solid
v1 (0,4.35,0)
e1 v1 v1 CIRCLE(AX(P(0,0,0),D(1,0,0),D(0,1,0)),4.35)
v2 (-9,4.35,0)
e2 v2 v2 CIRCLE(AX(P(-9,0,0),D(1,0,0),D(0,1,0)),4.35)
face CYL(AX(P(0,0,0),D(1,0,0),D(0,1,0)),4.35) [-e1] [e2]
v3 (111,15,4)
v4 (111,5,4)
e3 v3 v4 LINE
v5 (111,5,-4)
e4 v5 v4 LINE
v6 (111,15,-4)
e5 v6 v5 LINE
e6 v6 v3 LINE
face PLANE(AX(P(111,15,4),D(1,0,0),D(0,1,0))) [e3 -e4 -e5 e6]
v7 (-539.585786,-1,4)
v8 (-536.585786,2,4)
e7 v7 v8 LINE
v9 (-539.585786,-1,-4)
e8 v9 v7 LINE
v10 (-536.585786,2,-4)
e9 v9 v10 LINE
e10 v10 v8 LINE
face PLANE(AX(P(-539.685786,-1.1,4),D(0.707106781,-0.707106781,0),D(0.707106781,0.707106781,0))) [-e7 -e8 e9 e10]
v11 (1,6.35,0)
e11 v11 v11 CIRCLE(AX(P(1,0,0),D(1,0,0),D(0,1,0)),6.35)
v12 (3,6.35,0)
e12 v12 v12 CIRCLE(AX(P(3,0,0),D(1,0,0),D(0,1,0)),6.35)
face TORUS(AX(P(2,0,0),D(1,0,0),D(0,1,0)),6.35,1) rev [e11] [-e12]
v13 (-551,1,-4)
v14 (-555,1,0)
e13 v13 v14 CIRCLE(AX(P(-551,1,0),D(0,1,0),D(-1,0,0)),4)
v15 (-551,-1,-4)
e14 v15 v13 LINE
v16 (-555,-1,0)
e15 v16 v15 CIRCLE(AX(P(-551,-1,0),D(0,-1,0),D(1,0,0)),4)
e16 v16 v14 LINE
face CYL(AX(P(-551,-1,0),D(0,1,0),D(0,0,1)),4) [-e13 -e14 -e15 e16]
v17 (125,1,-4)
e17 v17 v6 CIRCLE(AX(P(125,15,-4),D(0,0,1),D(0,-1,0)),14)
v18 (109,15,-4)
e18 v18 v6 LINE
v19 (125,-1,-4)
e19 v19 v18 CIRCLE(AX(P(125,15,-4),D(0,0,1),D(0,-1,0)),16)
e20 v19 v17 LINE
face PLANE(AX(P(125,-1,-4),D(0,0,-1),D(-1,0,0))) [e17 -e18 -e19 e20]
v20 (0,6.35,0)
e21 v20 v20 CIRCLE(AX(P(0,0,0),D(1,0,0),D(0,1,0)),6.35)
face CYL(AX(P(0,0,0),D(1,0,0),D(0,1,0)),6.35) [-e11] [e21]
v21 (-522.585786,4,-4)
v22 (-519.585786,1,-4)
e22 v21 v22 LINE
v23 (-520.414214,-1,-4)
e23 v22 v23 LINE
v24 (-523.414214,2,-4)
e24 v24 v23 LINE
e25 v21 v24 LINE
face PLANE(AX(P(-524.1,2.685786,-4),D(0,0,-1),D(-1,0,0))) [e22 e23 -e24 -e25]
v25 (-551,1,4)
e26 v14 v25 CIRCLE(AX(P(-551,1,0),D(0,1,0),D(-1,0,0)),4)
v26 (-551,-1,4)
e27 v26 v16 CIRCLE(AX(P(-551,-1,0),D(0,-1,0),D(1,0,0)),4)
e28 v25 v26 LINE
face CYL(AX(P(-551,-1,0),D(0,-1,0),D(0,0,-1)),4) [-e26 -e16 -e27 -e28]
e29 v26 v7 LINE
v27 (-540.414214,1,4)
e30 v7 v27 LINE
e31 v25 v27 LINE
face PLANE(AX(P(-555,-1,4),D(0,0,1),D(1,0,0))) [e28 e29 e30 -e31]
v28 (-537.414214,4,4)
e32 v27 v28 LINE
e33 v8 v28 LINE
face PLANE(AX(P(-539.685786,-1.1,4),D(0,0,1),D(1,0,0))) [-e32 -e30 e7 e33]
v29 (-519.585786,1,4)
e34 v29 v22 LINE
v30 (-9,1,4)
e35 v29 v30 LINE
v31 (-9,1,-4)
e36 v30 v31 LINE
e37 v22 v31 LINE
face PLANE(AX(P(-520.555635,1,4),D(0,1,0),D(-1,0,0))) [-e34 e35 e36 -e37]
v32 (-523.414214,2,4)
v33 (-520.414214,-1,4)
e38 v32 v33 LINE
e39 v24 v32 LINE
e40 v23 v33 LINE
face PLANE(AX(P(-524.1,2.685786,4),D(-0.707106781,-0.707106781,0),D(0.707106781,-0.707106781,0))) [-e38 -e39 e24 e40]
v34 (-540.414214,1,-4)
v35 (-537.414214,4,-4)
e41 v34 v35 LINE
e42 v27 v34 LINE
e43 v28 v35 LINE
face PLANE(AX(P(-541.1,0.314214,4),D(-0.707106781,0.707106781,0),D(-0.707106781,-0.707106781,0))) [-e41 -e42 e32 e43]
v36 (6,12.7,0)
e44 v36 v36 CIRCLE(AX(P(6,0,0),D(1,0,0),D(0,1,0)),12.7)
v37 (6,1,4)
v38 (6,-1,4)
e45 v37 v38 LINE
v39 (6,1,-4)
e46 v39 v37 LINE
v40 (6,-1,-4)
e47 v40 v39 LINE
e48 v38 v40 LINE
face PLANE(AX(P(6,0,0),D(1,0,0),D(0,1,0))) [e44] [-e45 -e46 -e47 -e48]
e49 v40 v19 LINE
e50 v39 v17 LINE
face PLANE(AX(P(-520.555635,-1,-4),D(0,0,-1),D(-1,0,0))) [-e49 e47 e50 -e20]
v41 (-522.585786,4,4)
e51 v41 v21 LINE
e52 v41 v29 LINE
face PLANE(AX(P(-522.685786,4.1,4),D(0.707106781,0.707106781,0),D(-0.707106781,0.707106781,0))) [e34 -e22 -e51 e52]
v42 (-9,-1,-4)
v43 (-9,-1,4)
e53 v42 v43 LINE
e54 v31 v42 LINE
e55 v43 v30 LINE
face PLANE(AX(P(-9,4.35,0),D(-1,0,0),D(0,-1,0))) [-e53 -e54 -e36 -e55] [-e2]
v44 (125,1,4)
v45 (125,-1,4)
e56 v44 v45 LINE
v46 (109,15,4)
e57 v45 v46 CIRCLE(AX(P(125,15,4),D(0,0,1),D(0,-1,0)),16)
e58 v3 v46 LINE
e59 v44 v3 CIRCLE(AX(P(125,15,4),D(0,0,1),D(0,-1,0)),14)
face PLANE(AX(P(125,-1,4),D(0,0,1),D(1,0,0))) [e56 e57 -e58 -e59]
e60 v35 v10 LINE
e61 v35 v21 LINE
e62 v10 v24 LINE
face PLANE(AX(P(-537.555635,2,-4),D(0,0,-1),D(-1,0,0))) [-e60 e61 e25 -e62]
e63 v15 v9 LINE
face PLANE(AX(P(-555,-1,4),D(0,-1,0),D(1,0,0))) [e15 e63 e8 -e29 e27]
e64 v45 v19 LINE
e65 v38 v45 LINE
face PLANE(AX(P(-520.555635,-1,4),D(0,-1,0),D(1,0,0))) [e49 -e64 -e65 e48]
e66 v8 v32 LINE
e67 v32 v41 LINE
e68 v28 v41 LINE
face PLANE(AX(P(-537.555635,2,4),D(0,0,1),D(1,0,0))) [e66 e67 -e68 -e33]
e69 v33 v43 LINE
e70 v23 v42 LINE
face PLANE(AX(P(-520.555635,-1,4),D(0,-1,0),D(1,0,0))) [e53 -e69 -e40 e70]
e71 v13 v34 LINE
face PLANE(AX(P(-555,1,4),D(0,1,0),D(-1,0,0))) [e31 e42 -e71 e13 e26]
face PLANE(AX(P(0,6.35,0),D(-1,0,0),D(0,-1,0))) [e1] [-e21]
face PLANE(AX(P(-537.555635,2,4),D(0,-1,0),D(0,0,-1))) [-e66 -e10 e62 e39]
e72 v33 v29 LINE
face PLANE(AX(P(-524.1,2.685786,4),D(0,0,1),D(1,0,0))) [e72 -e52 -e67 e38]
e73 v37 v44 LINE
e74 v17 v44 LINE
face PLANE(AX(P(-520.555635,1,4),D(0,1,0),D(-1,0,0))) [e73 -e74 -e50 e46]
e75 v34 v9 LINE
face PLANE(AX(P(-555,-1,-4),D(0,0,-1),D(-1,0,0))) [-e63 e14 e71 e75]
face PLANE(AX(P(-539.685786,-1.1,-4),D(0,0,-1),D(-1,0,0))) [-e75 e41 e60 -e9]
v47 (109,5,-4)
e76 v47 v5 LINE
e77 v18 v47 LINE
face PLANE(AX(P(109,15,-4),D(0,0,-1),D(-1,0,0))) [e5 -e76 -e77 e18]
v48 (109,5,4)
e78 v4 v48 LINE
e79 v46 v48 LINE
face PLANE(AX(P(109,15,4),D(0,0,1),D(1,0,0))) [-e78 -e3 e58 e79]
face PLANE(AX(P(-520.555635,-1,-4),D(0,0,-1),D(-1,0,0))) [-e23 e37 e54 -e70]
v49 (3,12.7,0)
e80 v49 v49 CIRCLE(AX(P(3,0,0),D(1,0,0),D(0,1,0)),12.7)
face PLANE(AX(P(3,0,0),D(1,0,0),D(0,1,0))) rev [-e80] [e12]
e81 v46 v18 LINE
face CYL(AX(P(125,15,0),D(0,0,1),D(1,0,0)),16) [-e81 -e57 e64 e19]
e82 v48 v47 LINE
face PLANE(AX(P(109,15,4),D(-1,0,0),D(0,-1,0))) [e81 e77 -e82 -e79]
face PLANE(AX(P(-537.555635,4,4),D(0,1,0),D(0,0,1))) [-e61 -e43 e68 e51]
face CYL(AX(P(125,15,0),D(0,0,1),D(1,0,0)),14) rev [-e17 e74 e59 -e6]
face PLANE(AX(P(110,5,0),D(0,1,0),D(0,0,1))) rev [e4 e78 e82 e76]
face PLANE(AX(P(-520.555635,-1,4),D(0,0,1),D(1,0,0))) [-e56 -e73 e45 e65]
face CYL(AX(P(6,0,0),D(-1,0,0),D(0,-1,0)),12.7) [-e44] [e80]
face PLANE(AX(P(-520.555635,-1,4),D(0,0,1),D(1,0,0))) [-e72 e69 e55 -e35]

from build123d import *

# Parameters (mm, degrees)
SZKIC6_R                    = 12.7
DODANIE_WYCI_GNI_CIE3_DEPTH = 3
SZKIC7_W                    = 8
SZKIC7_H                    = 2
ZAOKR_GLENIE3_R             = 4


with BuildPart() as part:
    # Szkic5 → Obrót1 (revolve)
    with BuildSketch(Plane.XY):
        with BuildLine():
            Line((0, 6.35), (1, 6.35))
            ThreePointArc((1, 6.35), (2, 5.35), (3, 6.35))
            Line((3, 6.35), (3, 0))
            Line((3, 0), (0, 0))
            Line((0, 0), (-9, 0))
            Line((-9, 0), (-9, 4.35))
            Line((-9, 4.35), (0, 4.35))
            Line((0, 4.35), (0, 6.35))
        make_face()
    revolve(axis=Axis((0, 0, 0), (-1, 0, 0)))

    # Szkic6 → Dodanie-wyciągnięcie3 (add)
    with BuildSketch(Plane(origin=(3, 0, 0), x_dir=(0, 0, -1), z_dir=(1, 0, 0))):
        with Locations(Location((0, 0, 0), (0, 0, 90))):
            Circle(SZKIC6_R)
    extrude(amount=DODANIE_WYCI_GNI_CIE3_DEPTH)

    # Wyciągnięcie po ścieżce1: sweep along a path in Szkic1
    with BuildLine(Plane.XY) as wyci_gni_cie_po_cie_ce1_path:
        Line((110, 5), (110, 15))
        ThreePointArc((110, 15), (135.606601718, 25.606601718), (125, 0))
        Line((125, 0), (0, 0))
        Line((0, 0), (-520, 0))
        Line((-520, 0), (-523, 3))
        Line((-523, 3), (-537, 3))
        Line((-537, 3), (-540, 0))
        Line((-540, 0), (-555, 0))
    # Szkic7 → Wyciągnięcie po ścieżce1 (sweep)
    with BuildSketch(Plane(origin=(0, 0, 0), x_dir=(0, 0, -1), z_dir=(1, 0, 0))):
        Rectangle(SZKIC7_W, SZKIC7_H)
    sweep(path=wyci_gni_cie_po_cie_ce1_path.line, transition=Transition.RIGHT)

    # Zaokrąglenie3
    zaokr_glenie3_edges = [part.edges().sort_by_distance(p)[0] for p in [
        (-555, 0, -4),
        (-555, 0, 4),
    ]]
    fillet(zaokr_glenie3_edges, radius=ZAOKR_GLENIE3_R - 0.0001)  # a hair under: the kernel refuses the full size


solid = part.part
